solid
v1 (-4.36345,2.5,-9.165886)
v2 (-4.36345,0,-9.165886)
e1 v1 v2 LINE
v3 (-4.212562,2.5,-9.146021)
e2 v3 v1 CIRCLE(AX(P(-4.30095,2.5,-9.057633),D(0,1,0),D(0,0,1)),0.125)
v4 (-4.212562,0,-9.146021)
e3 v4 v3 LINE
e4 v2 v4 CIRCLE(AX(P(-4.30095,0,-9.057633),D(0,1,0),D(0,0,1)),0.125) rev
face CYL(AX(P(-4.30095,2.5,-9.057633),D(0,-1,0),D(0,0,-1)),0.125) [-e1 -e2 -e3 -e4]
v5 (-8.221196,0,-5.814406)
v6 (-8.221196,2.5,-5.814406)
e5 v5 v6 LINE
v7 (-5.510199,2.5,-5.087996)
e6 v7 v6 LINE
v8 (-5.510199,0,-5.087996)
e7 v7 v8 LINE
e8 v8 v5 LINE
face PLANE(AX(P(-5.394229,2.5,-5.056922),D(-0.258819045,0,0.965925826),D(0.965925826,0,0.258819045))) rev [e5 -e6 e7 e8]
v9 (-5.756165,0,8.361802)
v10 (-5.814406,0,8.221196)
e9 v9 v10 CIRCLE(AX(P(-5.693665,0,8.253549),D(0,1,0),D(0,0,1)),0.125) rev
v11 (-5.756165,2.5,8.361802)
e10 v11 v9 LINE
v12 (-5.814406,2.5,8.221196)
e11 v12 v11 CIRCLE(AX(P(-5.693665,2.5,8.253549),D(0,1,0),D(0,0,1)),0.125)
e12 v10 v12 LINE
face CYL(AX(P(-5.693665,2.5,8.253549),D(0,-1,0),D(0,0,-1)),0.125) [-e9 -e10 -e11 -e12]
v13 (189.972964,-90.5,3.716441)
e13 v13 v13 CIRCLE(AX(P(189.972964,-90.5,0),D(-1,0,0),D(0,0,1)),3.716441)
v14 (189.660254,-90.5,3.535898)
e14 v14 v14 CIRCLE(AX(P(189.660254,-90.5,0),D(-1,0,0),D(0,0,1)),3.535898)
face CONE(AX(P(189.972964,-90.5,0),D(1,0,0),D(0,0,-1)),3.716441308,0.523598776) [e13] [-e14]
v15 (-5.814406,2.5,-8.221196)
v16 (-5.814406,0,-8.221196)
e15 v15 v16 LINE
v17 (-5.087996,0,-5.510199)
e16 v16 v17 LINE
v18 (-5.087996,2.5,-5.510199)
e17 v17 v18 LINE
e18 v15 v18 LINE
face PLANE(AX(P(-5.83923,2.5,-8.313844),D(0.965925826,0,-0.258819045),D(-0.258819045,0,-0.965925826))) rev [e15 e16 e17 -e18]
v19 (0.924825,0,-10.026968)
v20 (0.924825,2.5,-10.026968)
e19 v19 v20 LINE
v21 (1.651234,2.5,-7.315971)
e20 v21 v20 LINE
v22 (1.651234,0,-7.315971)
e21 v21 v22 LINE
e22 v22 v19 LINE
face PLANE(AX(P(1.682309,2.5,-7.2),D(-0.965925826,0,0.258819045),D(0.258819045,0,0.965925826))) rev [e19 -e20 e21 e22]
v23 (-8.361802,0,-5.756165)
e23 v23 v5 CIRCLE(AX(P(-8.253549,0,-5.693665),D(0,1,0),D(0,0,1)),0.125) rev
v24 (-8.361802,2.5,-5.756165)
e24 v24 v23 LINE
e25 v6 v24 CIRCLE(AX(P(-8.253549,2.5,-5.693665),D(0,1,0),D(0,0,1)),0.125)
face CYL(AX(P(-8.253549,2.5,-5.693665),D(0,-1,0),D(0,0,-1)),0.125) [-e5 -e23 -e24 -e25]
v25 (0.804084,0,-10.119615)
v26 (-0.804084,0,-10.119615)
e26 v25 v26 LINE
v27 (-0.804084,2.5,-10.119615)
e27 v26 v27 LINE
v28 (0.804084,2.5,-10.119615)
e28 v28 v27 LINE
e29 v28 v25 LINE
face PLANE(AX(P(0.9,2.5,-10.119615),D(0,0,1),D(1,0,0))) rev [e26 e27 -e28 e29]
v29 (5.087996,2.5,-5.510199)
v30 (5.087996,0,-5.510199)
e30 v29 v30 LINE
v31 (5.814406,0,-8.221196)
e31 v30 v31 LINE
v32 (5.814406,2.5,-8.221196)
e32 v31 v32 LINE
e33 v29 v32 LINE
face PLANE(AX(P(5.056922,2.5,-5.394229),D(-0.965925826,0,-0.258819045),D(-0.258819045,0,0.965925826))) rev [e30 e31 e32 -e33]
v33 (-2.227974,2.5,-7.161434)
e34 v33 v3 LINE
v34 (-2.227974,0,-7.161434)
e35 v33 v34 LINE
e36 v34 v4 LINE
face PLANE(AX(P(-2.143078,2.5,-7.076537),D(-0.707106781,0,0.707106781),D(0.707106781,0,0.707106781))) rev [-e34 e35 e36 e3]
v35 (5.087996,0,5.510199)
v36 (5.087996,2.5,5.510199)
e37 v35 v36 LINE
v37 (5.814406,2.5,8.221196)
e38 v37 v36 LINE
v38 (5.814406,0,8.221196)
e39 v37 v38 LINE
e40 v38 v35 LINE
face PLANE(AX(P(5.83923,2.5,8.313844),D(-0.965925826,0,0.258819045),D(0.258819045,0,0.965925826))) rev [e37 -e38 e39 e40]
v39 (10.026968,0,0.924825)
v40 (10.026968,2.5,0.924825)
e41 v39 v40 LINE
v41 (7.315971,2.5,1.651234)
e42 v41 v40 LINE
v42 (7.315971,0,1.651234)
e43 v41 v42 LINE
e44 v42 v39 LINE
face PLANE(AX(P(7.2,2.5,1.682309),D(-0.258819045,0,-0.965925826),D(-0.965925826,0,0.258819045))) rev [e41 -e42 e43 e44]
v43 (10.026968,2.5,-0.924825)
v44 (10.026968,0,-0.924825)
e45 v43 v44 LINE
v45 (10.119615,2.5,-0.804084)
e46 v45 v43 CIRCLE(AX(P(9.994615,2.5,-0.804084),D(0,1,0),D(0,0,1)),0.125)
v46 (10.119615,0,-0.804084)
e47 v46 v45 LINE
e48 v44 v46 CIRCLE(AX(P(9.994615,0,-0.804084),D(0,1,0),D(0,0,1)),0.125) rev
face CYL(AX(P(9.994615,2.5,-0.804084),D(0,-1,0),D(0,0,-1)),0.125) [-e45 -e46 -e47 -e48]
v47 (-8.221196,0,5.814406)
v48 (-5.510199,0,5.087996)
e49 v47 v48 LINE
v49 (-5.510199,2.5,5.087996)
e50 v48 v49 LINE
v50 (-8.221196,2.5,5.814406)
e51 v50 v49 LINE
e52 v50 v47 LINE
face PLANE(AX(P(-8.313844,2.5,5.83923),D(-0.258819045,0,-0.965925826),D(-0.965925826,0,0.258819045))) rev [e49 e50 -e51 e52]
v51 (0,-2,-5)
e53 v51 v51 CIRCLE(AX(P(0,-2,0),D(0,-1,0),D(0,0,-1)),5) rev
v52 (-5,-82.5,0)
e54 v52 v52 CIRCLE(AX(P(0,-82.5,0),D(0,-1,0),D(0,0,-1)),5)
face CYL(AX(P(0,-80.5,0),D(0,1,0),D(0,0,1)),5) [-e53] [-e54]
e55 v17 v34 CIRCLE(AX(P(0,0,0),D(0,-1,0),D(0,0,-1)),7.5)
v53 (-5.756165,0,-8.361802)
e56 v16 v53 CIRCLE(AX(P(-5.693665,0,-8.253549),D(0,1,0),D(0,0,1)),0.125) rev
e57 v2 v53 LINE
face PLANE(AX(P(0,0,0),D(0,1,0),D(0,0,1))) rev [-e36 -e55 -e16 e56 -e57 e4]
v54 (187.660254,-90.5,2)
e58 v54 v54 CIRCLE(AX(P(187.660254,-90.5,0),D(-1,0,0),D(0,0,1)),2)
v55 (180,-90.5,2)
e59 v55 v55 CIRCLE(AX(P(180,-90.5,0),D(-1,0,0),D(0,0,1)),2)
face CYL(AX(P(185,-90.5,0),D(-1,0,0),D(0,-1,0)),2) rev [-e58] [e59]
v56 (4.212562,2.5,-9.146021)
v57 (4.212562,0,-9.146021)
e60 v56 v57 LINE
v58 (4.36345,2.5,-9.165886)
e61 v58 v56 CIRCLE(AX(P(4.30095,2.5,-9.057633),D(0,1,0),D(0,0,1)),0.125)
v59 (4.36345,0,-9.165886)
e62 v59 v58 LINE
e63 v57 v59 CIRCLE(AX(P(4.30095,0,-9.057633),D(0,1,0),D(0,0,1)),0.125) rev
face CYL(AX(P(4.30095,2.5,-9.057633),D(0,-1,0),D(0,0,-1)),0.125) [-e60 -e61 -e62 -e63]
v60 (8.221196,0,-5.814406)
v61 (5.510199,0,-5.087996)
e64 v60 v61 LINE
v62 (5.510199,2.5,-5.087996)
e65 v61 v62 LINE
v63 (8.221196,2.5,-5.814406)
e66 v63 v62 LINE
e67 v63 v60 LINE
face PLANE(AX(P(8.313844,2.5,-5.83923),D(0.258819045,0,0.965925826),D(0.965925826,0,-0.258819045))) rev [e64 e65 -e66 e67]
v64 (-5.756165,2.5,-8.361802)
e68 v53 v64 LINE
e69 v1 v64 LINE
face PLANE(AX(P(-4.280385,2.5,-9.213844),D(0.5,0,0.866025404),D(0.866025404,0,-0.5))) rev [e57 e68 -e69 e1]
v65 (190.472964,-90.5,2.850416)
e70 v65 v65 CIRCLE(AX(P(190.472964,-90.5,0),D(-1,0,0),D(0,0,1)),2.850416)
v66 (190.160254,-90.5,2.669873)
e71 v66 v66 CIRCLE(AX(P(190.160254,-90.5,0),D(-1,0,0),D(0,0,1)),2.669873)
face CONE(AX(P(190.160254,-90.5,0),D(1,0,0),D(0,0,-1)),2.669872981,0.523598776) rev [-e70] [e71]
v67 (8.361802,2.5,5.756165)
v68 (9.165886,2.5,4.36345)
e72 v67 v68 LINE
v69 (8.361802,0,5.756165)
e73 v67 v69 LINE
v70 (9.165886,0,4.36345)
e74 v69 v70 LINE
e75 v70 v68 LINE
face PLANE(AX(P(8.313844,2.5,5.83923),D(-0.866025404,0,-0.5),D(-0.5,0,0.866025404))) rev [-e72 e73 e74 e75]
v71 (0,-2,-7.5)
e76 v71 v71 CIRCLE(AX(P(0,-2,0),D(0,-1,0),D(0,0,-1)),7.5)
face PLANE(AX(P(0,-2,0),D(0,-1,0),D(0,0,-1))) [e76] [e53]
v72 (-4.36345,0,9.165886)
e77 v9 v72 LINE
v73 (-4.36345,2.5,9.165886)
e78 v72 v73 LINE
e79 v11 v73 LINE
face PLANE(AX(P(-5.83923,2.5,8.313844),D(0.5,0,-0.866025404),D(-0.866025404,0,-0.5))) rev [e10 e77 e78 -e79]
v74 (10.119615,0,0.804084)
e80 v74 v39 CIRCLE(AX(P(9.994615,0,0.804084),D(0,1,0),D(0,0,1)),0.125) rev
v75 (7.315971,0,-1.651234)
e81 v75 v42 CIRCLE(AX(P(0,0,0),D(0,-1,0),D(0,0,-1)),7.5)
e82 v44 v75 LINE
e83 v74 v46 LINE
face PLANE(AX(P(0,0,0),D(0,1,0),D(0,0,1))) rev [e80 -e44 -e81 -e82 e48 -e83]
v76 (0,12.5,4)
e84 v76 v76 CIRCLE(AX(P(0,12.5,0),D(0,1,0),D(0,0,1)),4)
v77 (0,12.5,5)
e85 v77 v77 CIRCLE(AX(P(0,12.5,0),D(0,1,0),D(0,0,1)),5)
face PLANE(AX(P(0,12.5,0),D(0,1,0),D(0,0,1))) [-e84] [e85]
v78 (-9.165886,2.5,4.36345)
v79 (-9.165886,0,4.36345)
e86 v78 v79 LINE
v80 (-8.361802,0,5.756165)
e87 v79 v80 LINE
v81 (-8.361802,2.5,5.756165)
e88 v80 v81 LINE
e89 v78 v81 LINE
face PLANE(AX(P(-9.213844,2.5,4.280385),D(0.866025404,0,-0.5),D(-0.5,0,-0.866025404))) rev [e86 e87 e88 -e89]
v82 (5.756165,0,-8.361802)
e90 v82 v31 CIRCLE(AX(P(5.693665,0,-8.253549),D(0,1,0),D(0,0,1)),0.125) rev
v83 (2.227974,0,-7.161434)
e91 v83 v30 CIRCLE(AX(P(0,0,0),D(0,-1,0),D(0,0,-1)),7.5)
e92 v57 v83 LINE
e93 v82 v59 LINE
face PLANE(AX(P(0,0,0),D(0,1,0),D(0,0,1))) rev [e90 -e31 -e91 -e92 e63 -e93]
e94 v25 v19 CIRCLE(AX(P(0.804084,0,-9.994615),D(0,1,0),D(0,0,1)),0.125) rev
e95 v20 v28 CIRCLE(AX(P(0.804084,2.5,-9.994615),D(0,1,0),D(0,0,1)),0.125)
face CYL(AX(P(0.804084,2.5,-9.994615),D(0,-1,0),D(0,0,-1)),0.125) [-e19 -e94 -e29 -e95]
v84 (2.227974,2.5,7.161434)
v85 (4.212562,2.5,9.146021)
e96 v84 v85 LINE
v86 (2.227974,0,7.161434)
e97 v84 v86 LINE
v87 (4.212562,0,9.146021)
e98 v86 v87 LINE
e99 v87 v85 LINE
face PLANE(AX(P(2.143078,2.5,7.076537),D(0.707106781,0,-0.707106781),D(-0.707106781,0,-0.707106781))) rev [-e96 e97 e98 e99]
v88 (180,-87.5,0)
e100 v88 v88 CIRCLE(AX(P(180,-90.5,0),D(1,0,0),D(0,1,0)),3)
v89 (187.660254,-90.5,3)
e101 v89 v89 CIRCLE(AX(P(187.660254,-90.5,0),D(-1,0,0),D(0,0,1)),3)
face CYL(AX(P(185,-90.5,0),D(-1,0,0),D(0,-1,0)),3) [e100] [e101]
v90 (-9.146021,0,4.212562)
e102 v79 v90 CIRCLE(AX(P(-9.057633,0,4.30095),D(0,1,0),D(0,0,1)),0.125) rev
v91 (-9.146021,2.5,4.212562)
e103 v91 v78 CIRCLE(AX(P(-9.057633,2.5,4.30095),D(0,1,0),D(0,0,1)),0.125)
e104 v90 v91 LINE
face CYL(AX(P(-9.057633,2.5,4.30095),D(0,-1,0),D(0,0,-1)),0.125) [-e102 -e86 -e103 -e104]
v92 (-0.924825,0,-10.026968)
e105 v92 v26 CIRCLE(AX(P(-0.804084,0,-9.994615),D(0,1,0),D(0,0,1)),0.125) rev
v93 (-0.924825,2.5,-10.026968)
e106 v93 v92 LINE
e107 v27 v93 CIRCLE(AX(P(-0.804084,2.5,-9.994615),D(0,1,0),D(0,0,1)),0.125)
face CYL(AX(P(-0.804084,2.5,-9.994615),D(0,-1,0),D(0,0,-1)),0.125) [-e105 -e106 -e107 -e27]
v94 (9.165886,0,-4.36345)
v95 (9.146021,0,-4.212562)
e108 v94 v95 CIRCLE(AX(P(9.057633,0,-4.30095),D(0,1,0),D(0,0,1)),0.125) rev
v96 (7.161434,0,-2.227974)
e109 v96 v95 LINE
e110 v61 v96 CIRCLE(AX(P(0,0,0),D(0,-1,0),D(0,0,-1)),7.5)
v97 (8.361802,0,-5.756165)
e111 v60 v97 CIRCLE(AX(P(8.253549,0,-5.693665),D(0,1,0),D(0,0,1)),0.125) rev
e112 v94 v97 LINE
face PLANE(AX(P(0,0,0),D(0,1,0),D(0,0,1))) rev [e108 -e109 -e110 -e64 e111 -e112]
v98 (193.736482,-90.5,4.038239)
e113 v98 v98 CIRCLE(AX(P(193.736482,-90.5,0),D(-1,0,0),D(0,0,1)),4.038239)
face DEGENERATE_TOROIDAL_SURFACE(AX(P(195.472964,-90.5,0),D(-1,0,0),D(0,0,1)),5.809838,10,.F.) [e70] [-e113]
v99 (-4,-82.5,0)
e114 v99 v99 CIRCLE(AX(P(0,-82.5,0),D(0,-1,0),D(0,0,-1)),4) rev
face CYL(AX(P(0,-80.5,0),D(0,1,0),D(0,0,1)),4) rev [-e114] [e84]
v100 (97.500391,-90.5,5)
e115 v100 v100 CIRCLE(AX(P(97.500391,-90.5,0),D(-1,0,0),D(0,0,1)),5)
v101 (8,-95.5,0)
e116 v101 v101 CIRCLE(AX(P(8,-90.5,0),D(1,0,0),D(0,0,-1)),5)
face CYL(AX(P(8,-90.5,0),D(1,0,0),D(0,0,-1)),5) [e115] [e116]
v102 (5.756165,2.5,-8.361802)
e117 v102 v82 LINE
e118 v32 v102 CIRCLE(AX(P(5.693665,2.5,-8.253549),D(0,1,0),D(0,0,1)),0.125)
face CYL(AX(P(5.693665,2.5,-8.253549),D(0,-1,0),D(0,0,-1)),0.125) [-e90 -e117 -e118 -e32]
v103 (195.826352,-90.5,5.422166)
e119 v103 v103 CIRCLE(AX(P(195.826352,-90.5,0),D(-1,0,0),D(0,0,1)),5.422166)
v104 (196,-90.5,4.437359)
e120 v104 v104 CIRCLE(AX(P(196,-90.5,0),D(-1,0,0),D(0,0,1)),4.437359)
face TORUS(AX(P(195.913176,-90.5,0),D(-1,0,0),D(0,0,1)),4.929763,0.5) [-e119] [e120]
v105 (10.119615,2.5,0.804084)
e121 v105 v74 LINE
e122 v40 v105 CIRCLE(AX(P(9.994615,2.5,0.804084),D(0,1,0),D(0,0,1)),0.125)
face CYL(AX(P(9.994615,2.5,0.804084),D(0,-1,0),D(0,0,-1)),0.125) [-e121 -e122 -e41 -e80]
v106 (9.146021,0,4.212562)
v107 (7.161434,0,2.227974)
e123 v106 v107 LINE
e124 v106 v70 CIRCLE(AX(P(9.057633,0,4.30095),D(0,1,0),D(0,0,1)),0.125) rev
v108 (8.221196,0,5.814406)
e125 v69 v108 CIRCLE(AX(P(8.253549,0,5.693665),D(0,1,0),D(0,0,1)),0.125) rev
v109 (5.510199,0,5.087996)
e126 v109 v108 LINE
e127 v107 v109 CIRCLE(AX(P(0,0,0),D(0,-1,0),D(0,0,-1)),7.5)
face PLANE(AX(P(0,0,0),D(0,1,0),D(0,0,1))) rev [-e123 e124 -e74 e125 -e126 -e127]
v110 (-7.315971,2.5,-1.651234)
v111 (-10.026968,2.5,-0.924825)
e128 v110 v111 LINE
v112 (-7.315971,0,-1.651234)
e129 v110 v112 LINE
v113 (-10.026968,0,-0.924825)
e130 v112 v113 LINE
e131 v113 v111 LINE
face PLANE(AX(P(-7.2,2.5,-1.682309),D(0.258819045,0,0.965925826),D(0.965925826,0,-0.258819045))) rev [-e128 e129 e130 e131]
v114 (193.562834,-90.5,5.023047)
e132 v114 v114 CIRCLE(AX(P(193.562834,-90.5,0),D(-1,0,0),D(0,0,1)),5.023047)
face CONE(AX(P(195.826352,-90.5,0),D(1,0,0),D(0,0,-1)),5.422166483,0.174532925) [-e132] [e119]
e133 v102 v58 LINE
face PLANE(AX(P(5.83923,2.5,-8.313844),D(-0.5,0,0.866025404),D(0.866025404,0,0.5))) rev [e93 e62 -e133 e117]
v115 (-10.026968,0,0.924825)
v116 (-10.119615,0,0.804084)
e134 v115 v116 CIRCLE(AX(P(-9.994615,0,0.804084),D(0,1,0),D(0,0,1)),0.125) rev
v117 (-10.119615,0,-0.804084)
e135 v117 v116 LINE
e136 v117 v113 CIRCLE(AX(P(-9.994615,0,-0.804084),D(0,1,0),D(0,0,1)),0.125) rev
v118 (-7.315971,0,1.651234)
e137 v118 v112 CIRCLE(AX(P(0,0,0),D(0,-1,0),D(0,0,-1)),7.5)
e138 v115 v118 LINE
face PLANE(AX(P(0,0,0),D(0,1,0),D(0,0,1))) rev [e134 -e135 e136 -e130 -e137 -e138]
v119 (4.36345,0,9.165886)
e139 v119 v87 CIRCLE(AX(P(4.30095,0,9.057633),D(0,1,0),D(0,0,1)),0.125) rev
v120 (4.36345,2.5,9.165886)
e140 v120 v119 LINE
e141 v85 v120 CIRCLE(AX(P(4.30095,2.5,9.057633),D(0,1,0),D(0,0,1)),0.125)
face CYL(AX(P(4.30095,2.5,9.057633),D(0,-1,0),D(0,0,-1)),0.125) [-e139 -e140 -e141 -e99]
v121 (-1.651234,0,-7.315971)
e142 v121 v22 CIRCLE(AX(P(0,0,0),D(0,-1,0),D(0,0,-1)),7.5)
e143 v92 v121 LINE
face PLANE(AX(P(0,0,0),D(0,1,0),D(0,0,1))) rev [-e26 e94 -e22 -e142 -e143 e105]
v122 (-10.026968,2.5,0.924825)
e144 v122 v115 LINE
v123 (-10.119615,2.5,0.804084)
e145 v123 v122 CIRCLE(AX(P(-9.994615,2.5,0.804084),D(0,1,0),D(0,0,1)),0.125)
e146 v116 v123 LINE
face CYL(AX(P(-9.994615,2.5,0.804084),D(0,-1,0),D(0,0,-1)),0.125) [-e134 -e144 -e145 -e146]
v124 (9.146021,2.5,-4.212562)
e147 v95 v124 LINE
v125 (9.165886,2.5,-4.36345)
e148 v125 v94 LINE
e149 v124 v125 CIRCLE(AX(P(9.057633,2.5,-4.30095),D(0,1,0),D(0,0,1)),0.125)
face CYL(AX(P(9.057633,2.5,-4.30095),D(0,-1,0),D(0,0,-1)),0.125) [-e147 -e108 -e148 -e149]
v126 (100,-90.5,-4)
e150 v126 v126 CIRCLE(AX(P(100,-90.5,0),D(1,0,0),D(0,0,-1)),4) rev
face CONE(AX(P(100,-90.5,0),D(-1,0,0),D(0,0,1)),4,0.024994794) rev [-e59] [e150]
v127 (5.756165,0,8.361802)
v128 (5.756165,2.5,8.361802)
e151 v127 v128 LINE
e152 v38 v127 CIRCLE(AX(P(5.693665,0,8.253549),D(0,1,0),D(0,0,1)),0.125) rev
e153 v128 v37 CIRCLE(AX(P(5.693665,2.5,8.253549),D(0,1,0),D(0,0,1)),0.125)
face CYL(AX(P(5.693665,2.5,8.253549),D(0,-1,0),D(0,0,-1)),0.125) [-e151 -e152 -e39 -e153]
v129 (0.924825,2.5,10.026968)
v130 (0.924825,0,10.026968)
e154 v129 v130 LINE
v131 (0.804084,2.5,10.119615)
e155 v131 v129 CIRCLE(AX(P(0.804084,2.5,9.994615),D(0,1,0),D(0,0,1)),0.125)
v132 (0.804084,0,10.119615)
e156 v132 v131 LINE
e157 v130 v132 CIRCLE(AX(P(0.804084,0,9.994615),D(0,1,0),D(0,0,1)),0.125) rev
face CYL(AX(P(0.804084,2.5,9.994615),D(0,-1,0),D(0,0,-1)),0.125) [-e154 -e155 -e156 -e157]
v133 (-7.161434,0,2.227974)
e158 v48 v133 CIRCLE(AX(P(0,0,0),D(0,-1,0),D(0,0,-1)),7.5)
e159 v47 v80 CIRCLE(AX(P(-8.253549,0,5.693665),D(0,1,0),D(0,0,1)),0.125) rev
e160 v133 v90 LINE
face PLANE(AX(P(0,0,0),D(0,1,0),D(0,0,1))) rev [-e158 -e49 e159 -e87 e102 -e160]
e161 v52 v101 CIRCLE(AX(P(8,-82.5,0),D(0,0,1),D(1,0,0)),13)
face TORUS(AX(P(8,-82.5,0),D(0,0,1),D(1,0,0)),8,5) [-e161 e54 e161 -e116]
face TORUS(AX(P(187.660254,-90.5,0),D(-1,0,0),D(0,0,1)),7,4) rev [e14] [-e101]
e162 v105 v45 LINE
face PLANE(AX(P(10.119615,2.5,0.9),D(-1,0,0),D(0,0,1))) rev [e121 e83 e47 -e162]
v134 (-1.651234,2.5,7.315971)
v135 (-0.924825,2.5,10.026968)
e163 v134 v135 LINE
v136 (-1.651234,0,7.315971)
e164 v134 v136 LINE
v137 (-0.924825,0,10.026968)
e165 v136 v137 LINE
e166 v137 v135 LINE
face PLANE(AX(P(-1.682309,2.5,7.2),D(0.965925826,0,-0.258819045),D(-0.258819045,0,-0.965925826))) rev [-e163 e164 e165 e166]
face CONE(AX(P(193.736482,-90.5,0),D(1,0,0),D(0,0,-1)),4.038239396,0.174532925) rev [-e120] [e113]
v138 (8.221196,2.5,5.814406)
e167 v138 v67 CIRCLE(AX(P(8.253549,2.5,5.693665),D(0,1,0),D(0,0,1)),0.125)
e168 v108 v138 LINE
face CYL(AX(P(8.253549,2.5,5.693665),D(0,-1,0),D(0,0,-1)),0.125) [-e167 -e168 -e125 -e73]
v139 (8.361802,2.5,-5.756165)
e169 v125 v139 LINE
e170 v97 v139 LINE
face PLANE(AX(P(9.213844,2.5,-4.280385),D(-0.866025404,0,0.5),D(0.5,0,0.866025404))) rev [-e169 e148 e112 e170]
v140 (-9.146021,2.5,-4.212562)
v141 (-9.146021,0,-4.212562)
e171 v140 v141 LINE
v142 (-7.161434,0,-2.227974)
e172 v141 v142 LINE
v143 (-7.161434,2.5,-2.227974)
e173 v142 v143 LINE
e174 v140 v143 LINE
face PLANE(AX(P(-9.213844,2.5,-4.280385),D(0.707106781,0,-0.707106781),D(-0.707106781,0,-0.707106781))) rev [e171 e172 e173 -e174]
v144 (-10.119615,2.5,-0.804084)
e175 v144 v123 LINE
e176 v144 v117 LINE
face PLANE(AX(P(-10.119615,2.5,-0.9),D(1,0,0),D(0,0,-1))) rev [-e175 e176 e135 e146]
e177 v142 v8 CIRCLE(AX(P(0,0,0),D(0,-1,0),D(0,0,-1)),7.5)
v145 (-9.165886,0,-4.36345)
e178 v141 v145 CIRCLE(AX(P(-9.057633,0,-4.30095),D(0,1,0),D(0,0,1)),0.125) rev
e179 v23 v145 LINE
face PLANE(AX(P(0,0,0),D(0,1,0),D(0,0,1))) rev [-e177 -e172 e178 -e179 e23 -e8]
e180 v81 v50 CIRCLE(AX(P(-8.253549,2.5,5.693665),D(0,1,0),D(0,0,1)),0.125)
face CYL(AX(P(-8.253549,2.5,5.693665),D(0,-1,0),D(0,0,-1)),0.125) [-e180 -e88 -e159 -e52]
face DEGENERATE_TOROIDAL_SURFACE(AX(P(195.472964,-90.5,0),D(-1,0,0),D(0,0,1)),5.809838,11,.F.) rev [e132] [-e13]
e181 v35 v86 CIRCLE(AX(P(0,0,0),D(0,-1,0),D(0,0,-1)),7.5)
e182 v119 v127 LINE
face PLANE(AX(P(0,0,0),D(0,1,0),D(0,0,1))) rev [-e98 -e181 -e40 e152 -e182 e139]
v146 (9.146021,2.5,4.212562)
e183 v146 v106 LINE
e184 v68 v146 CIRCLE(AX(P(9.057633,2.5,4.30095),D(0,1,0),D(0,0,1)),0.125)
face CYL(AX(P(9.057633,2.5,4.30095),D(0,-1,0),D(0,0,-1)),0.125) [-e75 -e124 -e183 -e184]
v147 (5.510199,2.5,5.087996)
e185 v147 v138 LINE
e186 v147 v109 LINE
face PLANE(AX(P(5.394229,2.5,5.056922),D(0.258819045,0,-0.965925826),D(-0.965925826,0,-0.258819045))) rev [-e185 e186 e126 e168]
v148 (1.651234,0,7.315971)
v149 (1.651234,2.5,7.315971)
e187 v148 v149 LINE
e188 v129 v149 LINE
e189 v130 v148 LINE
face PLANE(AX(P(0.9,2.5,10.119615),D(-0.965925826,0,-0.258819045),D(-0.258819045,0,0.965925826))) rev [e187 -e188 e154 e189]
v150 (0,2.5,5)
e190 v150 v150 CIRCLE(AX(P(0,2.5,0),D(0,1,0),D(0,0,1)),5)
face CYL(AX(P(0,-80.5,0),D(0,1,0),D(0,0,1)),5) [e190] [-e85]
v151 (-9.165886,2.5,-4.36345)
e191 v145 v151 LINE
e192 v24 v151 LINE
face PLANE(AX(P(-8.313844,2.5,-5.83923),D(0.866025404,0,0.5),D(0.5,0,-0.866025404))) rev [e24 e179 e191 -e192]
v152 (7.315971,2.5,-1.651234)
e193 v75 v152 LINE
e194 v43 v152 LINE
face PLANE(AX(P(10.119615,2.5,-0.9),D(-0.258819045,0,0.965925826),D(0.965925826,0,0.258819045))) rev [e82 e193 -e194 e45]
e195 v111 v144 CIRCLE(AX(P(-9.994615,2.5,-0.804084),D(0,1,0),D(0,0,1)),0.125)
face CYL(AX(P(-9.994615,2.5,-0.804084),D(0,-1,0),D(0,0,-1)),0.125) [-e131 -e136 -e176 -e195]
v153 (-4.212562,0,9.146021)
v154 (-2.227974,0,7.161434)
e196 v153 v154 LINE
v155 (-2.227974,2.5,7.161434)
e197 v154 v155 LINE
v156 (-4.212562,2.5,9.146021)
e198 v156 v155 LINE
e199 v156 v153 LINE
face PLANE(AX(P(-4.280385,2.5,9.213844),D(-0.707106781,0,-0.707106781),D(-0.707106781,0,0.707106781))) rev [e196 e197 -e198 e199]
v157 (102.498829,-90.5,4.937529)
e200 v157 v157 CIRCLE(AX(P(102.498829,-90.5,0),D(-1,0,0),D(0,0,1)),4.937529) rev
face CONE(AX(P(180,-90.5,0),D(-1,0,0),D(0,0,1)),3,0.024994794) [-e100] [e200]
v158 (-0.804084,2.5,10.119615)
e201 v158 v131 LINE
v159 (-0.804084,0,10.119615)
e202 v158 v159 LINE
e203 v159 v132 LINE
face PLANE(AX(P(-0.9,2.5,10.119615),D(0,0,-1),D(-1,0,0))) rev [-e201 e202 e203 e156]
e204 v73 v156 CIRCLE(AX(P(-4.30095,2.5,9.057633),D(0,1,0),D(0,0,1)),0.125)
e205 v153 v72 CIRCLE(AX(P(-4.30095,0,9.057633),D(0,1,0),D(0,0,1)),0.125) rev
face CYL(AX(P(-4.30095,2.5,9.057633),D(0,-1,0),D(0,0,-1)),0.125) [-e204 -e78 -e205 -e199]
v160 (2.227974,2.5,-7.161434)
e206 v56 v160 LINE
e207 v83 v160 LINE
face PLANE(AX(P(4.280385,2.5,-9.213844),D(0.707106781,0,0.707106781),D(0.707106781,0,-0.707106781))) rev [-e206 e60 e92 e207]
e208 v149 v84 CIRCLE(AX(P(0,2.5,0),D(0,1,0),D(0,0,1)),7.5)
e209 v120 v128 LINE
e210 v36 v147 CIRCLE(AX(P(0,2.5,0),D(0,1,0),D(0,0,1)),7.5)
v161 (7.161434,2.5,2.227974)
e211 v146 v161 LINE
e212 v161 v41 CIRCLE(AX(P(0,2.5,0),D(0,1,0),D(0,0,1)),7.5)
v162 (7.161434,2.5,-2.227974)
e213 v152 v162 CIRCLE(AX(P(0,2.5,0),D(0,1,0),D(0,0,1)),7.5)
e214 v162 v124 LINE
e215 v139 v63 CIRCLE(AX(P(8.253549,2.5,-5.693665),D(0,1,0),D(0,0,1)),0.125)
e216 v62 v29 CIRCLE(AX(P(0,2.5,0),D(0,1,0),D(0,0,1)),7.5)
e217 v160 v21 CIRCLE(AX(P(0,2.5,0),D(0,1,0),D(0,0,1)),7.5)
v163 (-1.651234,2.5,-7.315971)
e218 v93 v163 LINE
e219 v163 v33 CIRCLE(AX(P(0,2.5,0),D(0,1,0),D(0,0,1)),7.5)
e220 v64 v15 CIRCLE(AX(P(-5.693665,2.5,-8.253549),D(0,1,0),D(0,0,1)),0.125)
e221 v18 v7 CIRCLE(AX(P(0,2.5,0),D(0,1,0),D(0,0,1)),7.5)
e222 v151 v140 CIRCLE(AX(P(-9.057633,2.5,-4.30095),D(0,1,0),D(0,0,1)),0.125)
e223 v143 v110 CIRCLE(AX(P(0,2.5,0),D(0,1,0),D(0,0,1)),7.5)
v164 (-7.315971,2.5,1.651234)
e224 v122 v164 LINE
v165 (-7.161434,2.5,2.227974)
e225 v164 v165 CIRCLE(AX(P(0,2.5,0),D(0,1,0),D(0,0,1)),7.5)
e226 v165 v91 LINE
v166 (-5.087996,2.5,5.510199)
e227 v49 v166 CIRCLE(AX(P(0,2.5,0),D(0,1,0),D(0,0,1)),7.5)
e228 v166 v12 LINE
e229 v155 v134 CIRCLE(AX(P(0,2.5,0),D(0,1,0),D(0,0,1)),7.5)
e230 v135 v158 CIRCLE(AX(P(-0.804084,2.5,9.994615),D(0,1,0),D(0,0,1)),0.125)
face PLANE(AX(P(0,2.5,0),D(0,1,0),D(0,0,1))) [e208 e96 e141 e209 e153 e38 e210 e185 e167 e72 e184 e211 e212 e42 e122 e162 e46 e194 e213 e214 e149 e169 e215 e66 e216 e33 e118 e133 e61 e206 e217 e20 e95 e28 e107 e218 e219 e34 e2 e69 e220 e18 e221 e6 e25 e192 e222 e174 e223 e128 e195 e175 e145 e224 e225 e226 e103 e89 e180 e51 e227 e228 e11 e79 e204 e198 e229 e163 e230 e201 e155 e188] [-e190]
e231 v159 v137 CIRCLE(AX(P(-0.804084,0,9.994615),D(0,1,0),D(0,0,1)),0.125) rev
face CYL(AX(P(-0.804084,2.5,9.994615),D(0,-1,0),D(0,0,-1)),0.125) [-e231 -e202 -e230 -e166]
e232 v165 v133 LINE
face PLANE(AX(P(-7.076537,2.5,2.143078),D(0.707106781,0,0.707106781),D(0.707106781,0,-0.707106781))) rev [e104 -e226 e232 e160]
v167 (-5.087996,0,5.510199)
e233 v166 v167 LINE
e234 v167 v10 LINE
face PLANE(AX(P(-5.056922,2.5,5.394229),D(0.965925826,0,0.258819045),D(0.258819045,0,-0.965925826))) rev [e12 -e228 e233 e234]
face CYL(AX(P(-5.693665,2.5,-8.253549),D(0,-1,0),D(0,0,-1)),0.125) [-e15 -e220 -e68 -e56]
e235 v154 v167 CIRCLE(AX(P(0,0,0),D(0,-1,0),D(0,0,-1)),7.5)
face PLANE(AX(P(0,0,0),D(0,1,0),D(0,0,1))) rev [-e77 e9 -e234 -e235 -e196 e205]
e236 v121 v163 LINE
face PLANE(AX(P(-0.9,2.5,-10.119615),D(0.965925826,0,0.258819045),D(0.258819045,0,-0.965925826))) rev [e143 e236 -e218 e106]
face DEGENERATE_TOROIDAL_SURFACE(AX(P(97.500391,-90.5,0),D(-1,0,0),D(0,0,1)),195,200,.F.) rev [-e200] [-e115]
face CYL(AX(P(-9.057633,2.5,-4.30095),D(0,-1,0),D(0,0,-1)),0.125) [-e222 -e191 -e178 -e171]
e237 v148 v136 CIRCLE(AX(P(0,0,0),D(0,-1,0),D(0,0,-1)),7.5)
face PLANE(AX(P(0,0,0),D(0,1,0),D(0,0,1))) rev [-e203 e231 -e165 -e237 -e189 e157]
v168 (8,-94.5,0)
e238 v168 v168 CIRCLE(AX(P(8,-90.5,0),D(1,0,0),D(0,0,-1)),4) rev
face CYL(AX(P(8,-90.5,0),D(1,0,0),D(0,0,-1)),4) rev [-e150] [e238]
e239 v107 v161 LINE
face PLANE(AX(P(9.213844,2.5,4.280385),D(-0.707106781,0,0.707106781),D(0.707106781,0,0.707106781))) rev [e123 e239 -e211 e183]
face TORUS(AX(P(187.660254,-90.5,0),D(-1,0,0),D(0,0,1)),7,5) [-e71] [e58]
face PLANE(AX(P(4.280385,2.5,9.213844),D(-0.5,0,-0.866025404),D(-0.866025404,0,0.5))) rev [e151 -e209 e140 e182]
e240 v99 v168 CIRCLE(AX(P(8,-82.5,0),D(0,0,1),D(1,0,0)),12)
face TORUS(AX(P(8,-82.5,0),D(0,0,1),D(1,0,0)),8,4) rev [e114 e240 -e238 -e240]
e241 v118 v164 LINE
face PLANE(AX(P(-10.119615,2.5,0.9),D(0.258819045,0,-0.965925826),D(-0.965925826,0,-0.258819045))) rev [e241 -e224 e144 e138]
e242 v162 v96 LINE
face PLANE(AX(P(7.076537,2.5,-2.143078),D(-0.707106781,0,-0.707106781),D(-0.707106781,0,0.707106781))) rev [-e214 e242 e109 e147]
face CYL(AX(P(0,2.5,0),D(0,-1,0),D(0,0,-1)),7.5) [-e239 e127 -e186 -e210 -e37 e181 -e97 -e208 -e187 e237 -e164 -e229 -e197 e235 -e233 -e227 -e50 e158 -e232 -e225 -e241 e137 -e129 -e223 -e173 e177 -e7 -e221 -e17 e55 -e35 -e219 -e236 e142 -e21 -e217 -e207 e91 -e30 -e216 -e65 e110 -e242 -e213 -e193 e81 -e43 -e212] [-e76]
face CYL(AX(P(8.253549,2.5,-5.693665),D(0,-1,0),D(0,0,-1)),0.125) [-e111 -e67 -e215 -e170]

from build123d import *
from build123d.topology import SkipClean

# Parameters (mm, degrees)
SKETCH1_R                = 7.5
BOSS_EXTRUDE1_DEPTH      = 2.5
BOSS_EXTRUDE2_DEPTH      = 10
BOSS_EXTRUDE2_DEPTH_BACK = 83
SKETCH2_R                = 5
SKETCH2_R_2              = 4
BOSS_EXTRUDE3_DEPTH      = 2.5
FILLET1_R                = 0.125
CIRPATTERN1_COUNT        = 12
FILLET1_OF_CIRPATTERN1_R = 0.125
SKETCH4_R                = 4
CUT_EXTRUDE1_DEPTH       = 2.5
SKETCH5_R                = 5
SKETCH5_R_2              = 4
FILLET2_R                = 200
SKETCH8_R                = 3
SKETCH8_R_2              = 2
BOSS_EXTRUDE4_DEPTH      = 5
BOSS_EXTRUDE5_START      = 2
SKETCH10_R               = 7.5
SKETCH10_R_2             = 5
BOSS_EXTRUDE5_DEPTH      = 2


with BuildPart() as part:
    # Sketch1 → Boss-Extrude1 (new body)
    with BuildSketch(Plane(origin=(0, 0, 0), x_dir=(1, 0, 0), z_dir=(0, 1, 0))):
        with Locations(Location((0, 0, 0), (0, 0, 270))):
            Circle(SKETCH1_R)
    extrude(amount=BOSS_EXTRUDE1_DEPTH)

    # Sketch2 → Boss-Extrude2 (add, two sides: drawn at the far end of the back side and taken through both)
    with BuildSketch(Plane(origin=(0, 2.5, 0), x_dir=(1, 0, 0), z_dir=(0, 1, 0)).offset(-BOSS_EXTRUDE2_DEPTH_BACK)):
        with Locations(Location((0, 0, 0), (0, 0, 270))):
            Circle(SKETCH2_R)
        with Locations(Location((0, 0, 0), (0, 0, 270))):
            Circle(SKETCH2_R_2, mode=Mode.SUBTRACT)
    extrude(amount=BOSS_EXTRUDE2_DEPTH + BOSS_EXTRUDE2_DEPTH_BACK)

    # Sketch3 → Boss-Extrude3 (add)
    with BuildSketch(Plane.XZ):
        Polygon((0, 10.119615242), (0.9, 10.119615242), (1.682308546, 7.2), (-1.682308546, 7.2), (-0.9, 10.119615242), align=None)
    boss_extrude3 = extrude(amount=-BOSS_EXTRUDE3_DEPTH)

    # Fillet1
    fillet1_edges = [part.edges().sort_by_distance(p)[0] for p in [
        (0.9, 1.25, 10.119615242),
        (-0.9, 1.25, 10.119615242),
    ]]
    fillet(fillet1_edges, radius=FILLET1_R)

    # CirPattern1: Boss-Extrude3 ×12 about axis
    cirpattern1_axis = Axis((0, 0, 0), (0, 1, 0))
    for i in range(1, CIRPATTERN1_COUNT):
        add(boss_extrude3.rotate(cirpattern1_axis, i * 360 / CIRPATTERN1_COUNT))

    # Fillet1 of CirPattern1
    fillet1_of_cirpattern1_edges = [part.edges().sort_by_distance(p)[0] for p in [
        (5.839230485, 1.25, 8.313843876),
        (4.280384758, 1.25, 9.213843876),
        (9.213843876, 1.25, 4.280384758),
        (8.313843876, 1.25, 5.839230485),
        (10.119615242, 1.25, -0.9),
        (10.119615242, 1.25, 0.9),
        (8.313843876, 1.25, -5.839230485),
        (9.213843876, 1.25, -4.280384758),
        (4.280384758, 1.25, -9.213843876),
        (5.839230485, 1.25, -8.313843876),
        (-0.9, 1.25, -10.119615242),
        (0.9, 1.25, -10.119615242),
        (-5.839230485, 1.25, -8.313843876),
        (-4.280384758, 1.25, -9.213843876),
        (-9.213843876, 1.25, -4.280384758),
        (-8.313843876, 1.25, -5.839230485),
        (-10.119615242, 1.25, 0.9),
        (-10.119615242, 1.25, -0.9),
        (-8.313843876, 1.25, 5.839230485),
        (-9.213843876, 1.25, 4.280384758),
        (-4.280384758, 1.25, 9.213843876),
        (-5.839230485, 1.25, 8.313843876),
    ]]
    fillet(fillet1_of_cirpattern1_edges, radius=FILLET1_OF_CIRPATTERN1_R)

    # Sketch4 → Cut-Extrude1 (cut)
    with BuildSketch(Plane(origin=(0, 2.5, 0), x_dir=(1, 0, 0), z_dir=(0, 1, 0))):
        with Locations(Location((0, 0, 0), (0, 0, 270))):
            Circle(SKETCH4_R)
    extrude(amount=-CUT_EXTRUDE1_DEPTH, mode=Mode.SUBTRACT)

    # Sweep3: sweep along a path in Sketch6
    with BuildLine(Plane.XY) as sweep3_path:
        Line((0, -80.5), (0, -82.5))
        ThreePointArc((0, -82.5), (2.343145751, -88.156854249), (8, -90.5))
        Line((8, -90.5), (100, -90.5))
    # Sketch5 → Sweep3 (sweep)
    with BuildSketch(Plane.XZ.offset(80.5)):
        Circle(SKETCH5_R)
        Circle(SKETCH5_R_2, mode=Mode.SUBTRACT)
    sweep(path=sweep3_path.line)

    # Sketch7 → Revolve1 (revolve)
    with BuildSketch(Plane.XY, mode=Mode.PRIVATE) as revolve1_sk:
        Polygon((180, -88.5), (100, -86.5), (100, -85.5), (180, -87.5), align=None)
    revolve(revolve1_sk.sketch.rotate(Axis((100, -90.5, 0), (1, 0, 0)), 270), axis=Axis((100, -90.5, 0), (1, 0, 0)))

    # Fillet2
    # the kernel refuses this fillet: 200 mm, written as the material it takes off along each edge
    with BuildSketch(Plane(origin=(100, -90.5, 0), x_dir=(0, 1, 0), z_dir=(0, 0, -1))) as fillet2_piece_1:
        with BuildLine():
            CenterArc((5 - FILLET2_R, -FILLET2_R * 0.0124980474851), FILLET2_R, 0, 1.432096184)
            Line((5 - FILLET2_R * 0.000312353591877, FILLET2_R * 0.0124941436751), (5, 0))
            Line((5, 0), (5, -FILLET2_R * 0.0124980474851))
        make_face()
    revolve(axis=Axis((100, -90.5, 0), (1, 0, 0)), revolution_arc=270, mode=Mode.SUBTRACT)
    with BuildSketch(Plane(origin=(100, -90.5, 0), x_dir=(0, 0, -1), z_dir=(0, -1, 0))) as fillet2_piece_2:
        with BuildLine():
            CenterArc((5 - FILLET2_R, -FILLET2_R * 0.0124980474851), FILLET2_R, 0, 1.432096184)
            Line((5 - FILLET2_R * 0.000312353591877, FILLET2_R * 0.0124941436751), (5, 0))
            Line((5, 0), (5, -FILLET2_R * 0.0124980474851))
        make_face()
    revolve(axis=Axis((100, -90.5, 0), (1, 0, 0)), revolution_arc=90, mode=Mode.SUBTRACT)

    # Sketch8 → Boss-Extrude4 (add)
    with BuildSketch(Plane(origin=(180, 0, 0), x_dir=(0, 0, -1), z_dir=(1, 0, 0))):
        with Locations(Location((0, -90.5, 0), (0, 0, 90))):
            Circle(SKETCH8_R)
        with Locations(Location((0, -90.5, 0), (0, 0, 180))):
            Circle(SKETCH8_R_2, mode=Mode.SUBTRACT)
    extrude(amount=BOSS_EXTRUDE4_DEPTH)

    # Sketch9 → Revolve2 (revolve)
    with BuildSketch(Plane.XY, mode=Mode.PRIVATE) as revolve2_sk:
        with BuildLine():
            Line((185, -88.5), (187.660254038, -88.5))
            ThreePointArc((187.660254038, -88.5), (188.954349263, -88.329629131), (190.160254038, -87.830127019))
            Line((190.160254038, -87.830127019), (190.472963553, -87.649584096))
            ThreePointArc((190.472963553, -87.649584096), (192.05276212, -86.912911926), (193.736481777, -86.461760604))
            Line((193.736481777, -86.461760604), (196, -86.06264127))
            ThreePointArc((196, -86.06264127), (196.405579788, -85.483413304), (195.826351822, -85.077833517))
            Line((195.826351822, -85.077833517), (193.562833599, -85.476952851))
            ThreePointArc((193.562833599, -85.476952851), (191.710741977, -85.973219305), (189.972963553, -86.783558692))
            Line((189.972963553, -86.783558692), (189.660254038, -86.964101615))
            ThreePointArc((189.660254038, -86.964101615), (188.695530218, -87.363703305), (187.660254038, -87.5))
            Line((187.660254038, -87.5), (185, -87.5))
            Line((185, -87.5), (185, -88.5))
        make_face()
    revolve(revolve2_sk.sketch.rotate(Axis((185, -90.5, 0), (1, 0, 0)), 90), axis=Axis((185, -90.5, 0), (1, 0, 0)))

    # Sketch10 → Boss-Extrude5 (add)
    with SkipClean():  # the faces are left unmerged after this step: merging them gives an invalid solid
        with BuildSketch(Plane.XZ.offset(BOSS_EXTRUDE5_START)):
            with Locations(Location((0, 0, 0), (0, 0, 270))):
                Circle(SKETCH10_R)
            with Locations(Location((0, 0, 0), (0, 0, 180))):
                Circle(SKETCH10_R_2, mode=Mode.SUBTRACT)
        extrude(amount=-BOSS_EXTRUDE5_DEPTH)
    add(part.part.scale(1), mode=Mode.REPLACE)  # the faces are merged on a copy


solid = part.part
